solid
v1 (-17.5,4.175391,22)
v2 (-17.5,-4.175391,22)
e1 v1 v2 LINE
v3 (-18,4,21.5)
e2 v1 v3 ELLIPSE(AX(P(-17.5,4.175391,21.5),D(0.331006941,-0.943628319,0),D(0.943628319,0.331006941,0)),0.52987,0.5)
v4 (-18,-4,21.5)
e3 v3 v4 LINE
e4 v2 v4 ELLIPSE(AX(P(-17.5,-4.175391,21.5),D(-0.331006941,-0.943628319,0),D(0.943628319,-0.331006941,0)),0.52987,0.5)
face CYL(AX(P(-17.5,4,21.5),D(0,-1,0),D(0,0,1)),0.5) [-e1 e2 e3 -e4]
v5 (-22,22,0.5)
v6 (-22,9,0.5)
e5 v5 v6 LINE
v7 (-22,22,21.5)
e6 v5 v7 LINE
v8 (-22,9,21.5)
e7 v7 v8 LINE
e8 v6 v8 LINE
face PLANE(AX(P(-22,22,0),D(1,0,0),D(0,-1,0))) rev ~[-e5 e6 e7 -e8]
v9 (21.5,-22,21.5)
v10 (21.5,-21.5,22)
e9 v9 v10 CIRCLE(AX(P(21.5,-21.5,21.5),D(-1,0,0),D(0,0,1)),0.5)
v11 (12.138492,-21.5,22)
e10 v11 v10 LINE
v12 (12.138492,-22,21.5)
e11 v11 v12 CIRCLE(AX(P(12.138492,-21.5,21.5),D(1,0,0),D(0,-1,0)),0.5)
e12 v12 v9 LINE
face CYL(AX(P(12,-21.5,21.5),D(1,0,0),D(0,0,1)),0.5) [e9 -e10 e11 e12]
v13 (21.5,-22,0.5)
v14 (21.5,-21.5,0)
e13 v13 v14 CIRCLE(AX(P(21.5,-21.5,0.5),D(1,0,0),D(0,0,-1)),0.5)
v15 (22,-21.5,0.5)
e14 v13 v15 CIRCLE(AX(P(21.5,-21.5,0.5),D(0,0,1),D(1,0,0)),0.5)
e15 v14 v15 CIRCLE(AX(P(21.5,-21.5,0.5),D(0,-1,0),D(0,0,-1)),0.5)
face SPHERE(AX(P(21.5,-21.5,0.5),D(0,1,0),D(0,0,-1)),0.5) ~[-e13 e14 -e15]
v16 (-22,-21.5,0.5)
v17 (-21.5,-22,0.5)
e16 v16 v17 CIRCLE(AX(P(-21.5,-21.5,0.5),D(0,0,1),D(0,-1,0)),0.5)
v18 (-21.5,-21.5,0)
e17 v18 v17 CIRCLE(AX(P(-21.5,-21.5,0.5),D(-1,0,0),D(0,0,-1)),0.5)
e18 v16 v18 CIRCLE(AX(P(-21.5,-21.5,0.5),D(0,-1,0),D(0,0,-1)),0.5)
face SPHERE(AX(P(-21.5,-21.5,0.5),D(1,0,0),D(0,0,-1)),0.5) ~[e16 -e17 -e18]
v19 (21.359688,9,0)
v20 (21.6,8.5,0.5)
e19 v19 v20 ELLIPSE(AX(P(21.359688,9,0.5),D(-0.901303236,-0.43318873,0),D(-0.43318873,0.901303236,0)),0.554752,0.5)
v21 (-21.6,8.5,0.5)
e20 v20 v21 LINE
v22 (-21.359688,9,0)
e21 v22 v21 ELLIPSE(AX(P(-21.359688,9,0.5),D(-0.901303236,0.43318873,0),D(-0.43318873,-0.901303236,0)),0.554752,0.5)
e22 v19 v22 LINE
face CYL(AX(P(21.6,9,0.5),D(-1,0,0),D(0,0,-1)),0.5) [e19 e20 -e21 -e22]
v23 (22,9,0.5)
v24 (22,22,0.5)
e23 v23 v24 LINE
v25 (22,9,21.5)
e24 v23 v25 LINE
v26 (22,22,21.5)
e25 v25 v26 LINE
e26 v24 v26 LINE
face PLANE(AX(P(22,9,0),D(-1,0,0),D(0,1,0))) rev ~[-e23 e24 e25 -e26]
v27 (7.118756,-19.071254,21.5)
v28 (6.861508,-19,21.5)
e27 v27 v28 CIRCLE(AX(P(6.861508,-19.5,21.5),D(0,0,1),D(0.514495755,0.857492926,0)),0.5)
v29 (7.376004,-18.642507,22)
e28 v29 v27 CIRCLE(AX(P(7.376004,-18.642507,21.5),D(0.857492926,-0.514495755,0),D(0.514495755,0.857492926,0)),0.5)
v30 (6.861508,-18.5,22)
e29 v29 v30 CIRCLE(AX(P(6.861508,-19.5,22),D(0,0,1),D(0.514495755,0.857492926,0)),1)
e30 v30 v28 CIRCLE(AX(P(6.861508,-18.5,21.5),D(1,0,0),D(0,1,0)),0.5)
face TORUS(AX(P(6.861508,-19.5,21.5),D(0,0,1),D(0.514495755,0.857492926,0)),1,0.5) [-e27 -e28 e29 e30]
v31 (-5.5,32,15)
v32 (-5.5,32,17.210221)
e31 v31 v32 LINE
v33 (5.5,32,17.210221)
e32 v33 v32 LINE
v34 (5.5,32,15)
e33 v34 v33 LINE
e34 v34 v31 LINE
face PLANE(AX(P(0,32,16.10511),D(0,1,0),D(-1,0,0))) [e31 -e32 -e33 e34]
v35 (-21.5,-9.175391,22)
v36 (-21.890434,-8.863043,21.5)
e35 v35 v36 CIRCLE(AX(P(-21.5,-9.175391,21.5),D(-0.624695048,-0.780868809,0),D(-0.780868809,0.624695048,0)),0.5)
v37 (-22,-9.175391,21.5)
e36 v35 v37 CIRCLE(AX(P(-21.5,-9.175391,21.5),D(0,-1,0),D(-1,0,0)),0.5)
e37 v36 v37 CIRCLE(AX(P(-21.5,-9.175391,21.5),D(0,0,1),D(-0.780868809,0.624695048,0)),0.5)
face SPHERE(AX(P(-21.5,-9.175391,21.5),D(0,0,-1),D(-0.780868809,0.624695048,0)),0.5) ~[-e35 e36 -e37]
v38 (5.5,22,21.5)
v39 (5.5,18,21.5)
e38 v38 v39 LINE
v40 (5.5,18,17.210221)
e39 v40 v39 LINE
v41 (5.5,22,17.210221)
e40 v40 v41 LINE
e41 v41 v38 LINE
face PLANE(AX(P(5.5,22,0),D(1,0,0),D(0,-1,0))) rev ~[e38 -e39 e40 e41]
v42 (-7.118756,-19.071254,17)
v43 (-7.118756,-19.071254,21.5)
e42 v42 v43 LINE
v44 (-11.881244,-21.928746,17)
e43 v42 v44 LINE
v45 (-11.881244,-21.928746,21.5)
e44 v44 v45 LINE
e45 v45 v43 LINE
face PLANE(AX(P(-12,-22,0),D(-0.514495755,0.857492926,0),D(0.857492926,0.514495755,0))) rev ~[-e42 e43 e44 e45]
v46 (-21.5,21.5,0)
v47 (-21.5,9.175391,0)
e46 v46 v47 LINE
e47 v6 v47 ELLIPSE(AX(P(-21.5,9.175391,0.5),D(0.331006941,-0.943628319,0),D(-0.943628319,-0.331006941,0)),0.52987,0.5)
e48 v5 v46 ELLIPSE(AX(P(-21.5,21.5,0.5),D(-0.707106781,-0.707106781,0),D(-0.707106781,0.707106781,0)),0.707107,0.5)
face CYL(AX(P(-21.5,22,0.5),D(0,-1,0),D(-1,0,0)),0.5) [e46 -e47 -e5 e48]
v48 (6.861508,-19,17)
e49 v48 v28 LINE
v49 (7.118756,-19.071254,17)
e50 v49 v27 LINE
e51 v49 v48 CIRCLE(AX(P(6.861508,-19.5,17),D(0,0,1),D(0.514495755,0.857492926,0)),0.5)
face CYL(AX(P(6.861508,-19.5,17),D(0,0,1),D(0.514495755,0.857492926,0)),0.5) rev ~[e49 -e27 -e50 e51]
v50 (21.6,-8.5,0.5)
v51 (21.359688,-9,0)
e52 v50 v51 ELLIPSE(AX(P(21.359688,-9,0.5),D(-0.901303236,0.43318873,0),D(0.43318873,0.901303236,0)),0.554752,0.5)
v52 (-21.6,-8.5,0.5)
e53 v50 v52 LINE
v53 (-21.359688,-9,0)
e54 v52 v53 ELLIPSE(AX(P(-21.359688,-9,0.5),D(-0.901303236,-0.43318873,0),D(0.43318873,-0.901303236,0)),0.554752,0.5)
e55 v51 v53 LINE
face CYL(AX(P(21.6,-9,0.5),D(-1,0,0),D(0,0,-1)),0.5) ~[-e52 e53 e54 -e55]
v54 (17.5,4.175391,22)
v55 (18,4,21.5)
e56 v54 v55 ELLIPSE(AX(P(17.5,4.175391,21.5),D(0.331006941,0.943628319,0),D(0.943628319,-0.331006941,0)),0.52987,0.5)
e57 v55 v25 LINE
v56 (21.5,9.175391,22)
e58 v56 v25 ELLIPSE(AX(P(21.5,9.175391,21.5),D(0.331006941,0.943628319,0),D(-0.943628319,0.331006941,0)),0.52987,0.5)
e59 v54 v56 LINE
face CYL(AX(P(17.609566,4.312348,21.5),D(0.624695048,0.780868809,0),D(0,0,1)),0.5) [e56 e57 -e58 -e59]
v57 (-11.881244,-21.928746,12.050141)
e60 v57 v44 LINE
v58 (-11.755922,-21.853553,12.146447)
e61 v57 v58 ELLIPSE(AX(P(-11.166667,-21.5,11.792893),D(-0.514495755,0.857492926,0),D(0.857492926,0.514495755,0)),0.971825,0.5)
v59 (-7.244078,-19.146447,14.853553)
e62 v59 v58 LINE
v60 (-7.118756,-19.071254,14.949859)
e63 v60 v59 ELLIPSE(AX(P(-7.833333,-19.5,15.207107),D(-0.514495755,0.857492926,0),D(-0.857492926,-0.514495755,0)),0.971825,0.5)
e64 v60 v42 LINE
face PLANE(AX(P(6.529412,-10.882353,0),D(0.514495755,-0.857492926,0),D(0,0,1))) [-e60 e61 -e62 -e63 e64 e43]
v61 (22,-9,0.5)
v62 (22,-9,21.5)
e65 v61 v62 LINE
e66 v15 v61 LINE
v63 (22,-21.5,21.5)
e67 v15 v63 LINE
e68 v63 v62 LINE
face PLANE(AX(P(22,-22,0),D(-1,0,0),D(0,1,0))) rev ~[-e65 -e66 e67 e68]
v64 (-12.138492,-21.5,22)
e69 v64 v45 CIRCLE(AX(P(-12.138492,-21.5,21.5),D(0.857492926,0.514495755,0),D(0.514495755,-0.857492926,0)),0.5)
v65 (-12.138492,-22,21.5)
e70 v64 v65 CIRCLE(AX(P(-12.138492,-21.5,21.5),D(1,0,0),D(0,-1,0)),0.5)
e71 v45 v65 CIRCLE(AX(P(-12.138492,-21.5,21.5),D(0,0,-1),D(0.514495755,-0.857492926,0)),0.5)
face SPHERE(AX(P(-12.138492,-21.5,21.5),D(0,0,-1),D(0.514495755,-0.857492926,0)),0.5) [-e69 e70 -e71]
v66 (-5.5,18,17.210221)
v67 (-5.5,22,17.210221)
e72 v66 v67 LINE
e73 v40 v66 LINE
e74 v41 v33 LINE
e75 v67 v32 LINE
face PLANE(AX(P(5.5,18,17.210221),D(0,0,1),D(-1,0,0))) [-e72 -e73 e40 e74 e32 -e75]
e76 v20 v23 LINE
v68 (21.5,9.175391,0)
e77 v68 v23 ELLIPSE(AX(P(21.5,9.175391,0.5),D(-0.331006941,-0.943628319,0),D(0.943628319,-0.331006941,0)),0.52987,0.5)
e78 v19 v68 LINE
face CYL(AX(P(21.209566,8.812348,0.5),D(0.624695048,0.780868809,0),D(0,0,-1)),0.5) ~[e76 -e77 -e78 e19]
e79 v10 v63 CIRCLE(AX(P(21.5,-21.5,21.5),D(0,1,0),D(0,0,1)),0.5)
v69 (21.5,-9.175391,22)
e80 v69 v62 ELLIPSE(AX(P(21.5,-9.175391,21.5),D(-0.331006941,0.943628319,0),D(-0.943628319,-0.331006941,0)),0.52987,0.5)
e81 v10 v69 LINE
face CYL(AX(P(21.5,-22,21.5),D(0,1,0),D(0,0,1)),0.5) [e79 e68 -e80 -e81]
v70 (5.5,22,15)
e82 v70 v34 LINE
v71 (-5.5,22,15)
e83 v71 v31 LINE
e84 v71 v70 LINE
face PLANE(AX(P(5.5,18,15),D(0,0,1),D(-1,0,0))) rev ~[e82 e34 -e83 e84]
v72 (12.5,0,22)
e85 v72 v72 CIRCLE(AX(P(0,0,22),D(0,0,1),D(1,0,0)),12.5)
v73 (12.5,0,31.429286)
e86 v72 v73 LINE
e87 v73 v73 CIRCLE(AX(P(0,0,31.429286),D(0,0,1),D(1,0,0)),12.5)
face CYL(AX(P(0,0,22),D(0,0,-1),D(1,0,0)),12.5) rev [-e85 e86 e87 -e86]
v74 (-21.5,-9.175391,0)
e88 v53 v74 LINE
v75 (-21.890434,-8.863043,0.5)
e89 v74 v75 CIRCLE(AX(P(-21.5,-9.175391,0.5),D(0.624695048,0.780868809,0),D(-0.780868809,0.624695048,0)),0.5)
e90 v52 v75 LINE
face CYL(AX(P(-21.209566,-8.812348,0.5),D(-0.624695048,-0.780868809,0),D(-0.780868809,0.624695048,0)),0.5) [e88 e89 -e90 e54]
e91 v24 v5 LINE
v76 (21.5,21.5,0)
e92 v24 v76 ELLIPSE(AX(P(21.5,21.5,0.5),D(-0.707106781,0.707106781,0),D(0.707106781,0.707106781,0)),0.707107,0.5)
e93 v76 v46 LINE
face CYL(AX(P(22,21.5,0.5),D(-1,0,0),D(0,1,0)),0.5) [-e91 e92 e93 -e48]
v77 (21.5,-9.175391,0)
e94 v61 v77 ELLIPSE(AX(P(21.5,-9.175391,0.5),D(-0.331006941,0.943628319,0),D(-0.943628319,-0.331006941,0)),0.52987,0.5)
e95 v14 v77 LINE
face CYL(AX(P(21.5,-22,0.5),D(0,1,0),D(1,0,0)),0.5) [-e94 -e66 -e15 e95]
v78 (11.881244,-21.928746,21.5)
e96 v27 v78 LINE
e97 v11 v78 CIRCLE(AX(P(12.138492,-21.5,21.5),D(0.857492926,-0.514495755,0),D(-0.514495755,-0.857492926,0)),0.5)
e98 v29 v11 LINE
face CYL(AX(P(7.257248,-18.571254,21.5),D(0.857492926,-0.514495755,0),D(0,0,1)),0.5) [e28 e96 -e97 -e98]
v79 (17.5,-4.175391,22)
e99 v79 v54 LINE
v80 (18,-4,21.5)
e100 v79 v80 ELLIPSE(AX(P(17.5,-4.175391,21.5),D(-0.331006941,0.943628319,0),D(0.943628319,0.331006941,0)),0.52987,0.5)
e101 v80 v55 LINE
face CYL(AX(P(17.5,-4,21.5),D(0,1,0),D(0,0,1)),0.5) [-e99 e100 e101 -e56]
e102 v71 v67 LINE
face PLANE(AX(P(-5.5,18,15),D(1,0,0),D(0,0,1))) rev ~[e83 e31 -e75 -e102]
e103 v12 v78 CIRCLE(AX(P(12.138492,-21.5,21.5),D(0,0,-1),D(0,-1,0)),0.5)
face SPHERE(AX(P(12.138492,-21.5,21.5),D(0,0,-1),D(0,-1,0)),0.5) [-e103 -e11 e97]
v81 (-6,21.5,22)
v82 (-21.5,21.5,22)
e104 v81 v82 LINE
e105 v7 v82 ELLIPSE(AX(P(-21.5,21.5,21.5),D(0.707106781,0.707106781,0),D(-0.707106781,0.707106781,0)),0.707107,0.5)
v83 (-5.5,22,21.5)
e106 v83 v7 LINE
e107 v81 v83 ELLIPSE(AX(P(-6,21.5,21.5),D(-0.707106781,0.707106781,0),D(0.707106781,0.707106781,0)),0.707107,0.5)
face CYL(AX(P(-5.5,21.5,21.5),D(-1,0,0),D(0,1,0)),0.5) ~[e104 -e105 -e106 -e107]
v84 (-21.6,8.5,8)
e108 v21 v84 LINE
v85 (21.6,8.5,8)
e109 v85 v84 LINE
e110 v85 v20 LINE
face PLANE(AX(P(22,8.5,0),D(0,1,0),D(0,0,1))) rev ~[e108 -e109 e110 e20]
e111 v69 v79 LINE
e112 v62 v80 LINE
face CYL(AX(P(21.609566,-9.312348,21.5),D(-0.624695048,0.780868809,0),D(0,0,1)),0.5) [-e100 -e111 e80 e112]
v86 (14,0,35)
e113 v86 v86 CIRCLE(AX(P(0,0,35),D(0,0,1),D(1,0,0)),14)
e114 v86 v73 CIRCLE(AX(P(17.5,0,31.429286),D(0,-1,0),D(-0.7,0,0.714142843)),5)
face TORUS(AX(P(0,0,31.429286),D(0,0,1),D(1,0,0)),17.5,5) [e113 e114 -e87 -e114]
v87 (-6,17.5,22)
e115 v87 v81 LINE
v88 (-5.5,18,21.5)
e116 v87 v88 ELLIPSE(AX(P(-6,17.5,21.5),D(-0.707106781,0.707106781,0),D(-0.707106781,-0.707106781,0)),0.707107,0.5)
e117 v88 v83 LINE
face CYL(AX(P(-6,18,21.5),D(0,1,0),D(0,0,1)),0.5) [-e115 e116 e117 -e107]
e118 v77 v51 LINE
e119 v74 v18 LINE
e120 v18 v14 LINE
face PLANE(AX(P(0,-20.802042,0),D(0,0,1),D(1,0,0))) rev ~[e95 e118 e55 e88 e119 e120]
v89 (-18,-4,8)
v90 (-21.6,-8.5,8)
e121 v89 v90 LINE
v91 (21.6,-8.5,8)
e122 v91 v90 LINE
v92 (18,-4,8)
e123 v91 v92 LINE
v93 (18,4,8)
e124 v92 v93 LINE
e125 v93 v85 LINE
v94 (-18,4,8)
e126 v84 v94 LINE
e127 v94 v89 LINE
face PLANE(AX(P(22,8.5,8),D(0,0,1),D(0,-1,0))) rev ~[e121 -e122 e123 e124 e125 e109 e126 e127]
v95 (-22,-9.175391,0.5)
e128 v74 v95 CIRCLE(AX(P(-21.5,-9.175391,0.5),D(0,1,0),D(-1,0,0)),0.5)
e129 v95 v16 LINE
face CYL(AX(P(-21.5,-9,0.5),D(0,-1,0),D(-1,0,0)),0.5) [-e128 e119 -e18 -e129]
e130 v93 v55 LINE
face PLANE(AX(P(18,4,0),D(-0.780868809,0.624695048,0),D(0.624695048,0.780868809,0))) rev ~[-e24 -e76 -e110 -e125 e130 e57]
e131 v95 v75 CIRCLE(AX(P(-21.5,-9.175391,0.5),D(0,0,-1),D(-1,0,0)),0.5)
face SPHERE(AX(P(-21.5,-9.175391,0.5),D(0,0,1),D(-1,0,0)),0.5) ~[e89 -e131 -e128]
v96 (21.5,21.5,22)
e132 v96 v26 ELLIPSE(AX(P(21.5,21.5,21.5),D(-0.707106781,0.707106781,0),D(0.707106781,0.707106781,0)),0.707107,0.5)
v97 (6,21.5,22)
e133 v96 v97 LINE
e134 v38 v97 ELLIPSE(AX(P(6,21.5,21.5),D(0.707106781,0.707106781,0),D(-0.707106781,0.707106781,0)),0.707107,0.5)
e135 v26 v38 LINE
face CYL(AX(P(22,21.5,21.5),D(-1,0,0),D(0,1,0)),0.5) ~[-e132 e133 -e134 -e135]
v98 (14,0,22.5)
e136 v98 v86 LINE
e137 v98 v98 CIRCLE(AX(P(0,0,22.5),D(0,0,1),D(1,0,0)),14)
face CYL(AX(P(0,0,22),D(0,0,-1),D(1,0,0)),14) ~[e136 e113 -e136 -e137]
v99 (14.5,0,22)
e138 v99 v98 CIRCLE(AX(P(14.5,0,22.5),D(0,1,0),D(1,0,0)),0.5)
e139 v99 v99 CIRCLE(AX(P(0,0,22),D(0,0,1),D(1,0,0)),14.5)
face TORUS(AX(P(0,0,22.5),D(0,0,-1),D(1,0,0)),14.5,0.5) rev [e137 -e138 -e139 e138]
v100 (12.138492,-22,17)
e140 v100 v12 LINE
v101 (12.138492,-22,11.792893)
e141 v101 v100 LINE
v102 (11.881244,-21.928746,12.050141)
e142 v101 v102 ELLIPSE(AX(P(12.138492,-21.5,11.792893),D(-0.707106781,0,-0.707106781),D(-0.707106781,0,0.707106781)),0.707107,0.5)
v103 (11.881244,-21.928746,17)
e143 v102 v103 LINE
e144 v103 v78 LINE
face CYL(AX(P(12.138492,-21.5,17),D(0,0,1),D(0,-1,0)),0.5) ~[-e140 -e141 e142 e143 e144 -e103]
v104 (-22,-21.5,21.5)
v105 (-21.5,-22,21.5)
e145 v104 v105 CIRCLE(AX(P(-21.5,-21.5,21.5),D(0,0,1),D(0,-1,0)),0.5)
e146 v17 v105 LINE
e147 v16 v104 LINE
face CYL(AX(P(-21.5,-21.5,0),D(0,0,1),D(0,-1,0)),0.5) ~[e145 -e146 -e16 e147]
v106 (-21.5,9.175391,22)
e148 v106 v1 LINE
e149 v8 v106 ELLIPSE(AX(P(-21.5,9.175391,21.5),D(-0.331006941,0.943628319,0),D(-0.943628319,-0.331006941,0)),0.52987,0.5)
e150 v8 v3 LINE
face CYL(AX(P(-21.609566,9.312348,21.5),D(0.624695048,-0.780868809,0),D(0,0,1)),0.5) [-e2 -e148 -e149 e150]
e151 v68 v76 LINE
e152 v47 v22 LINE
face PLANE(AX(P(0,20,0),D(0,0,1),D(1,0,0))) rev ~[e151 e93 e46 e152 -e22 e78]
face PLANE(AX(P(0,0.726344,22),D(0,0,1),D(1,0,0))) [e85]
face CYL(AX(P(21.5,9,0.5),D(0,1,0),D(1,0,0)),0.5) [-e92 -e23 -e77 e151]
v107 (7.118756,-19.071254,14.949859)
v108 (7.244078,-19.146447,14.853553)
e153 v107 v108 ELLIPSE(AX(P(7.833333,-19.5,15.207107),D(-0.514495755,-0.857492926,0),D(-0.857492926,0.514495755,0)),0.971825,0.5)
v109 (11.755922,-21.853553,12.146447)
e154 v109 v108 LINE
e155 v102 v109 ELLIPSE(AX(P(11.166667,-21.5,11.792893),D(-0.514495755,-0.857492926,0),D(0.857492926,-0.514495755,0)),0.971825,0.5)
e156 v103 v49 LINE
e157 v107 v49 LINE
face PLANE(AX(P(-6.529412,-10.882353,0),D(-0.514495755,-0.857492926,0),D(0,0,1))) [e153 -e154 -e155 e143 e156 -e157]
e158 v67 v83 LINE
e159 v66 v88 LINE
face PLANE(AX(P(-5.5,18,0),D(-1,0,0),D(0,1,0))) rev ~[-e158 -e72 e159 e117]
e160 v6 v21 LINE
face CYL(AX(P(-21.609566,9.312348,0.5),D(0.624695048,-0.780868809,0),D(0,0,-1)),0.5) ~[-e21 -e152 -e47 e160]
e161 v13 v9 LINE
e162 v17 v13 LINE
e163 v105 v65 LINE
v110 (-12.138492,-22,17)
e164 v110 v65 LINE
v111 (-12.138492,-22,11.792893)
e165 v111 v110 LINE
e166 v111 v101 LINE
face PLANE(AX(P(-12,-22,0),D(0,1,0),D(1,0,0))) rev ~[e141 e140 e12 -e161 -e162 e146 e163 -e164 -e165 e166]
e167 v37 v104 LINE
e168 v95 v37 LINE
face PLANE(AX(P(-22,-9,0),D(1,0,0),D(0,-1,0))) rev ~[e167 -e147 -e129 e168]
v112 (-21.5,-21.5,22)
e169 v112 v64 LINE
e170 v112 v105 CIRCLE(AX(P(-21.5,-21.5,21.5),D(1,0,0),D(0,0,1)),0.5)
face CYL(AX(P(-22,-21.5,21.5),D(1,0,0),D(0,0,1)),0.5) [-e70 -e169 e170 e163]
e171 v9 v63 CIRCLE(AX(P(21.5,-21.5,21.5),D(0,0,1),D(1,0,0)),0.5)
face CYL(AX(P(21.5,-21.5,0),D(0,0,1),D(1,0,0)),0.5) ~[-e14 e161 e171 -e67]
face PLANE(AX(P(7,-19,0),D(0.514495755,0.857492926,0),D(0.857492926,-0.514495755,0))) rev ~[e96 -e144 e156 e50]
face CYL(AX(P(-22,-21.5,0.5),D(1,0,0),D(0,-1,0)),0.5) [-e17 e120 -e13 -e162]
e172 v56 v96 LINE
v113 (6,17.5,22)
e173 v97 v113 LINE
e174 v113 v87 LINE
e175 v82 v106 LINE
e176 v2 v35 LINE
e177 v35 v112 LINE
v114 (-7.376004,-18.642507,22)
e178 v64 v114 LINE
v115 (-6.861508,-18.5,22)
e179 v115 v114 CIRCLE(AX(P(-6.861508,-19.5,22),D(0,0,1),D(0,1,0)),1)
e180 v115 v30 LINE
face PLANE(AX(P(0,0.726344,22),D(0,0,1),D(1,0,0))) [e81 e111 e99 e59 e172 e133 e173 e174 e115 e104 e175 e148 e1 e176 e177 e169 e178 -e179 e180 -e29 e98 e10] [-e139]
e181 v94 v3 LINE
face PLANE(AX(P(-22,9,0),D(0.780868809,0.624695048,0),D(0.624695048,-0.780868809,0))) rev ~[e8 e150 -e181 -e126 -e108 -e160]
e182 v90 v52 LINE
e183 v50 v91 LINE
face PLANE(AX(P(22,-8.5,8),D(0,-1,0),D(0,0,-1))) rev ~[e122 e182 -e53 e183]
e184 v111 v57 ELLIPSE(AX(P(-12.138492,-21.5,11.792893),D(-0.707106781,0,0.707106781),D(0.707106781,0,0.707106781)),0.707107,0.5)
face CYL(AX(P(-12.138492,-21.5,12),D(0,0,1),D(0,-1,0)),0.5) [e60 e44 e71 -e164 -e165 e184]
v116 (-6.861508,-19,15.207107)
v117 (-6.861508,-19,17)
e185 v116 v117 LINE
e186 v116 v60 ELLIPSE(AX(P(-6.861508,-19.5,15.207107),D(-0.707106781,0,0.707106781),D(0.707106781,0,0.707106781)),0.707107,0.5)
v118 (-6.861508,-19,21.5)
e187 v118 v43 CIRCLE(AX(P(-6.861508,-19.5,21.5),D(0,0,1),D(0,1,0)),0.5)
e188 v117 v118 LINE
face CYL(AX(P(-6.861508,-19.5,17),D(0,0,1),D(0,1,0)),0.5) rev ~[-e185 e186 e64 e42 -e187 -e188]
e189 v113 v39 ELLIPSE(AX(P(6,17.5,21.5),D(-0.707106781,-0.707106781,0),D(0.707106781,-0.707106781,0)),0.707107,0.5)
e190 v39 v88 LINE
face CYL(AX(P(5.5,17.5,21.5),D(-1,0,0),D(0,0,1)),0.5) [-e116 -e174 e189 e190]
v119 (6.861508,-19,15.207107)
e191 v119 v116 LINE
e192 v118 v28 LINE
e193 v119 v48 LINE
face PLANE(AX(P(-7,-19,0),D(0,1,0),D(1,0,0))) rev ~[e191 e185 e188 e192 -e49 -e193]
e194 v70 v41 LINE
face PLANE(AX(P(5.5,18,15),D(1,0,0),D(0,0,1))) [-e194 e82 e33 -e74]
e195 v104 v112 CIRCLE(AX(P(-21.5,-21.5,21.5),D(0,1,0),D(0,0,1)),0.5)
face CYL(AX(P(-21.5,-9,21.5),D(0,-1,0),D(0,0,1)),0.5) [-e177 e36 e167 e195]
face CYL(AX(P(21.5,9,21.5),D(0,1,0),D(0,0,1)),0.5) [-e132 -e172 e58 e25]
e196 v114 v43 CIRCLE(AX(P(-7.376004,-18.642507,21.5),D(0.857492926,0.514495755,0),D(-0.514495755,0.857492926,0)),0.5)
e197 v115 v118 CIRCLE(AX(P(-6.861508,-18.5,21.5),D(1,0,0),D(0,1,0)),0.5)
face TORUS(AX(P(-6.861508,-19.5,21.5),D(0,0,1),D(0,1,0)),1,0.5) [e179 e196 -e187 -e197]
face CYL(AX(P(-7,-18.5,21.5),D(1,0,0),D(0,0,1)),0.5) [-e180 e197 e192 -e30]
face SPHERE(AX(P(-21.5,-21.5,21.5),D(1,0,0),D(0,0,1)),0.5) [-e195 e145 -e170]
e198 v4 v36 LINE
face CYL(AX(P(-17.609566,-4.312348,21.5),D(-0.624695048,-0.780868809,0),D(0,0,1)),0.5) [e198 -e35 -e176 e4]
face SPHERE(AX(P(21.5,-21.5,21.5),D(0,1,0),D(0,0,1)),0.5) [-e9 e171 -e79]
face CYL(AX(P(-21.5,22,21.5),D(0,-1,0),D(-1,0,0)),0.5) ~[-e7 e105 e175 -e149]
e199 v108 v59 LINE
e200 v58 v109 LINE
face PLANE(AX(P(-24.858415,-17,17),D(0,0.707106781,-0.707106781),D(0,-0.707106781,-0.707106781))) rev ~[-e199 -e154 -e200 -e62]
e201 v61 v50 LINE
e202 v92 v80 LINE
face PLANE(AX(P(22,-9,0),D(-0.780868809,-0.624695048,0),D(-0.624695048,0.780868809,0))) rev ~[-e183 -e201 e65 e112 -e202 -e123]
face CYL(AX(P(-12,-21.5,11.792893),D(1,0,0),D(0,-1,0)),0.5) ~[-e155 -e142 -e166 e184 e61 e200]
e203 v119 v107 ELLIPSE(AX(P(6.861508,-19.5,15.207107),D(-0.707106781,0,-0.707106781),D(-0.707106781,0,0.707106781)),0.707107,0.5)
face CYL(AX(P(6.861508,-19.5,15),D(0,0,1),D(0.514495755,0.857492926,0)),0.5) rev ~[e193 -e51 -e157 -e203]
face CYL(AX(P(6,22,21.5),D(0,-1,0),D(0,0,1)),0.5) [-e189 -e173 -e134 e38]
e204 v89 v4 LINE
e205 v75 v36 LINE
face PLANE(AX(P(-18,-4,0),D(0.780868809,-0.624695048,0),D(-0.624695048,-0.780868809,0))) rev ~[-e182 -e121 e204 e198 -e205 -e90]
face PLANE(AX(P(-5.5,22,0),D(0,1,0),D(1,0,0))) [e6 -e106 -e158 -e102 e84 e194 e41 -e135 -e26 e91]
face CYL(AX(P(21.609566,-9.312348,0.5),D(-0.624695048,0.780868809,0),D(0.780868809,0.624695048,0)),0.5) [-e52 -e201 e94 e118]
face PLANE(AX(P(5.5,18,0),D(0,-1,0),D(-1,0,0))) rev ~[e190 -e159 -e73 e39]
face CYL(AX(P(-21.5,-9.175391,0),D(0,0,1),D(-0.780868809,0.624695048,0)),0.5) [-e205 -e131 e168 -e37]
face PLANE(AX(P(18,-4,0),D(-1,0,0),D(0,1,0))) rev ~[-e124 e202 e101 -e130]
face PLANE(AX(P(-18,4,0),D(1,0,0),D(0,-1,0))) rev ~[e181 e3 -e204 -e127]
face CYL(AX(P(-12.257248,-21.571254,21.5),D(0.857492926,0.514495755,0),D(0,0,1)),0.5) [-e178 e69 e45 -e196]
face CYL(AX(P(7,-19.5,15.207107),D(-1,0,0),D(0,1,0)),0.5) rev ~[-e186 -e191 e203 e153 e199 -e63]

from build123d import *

# Parameters (mm, degrees)
F1_DEPTH    = 22
F2_DEPTH    = 17
F3_T4_DEPTH = 49.7168298797
F5_DEPTH    = 44
F0_W        = 11
F0_H        = 4
F6_DEPTH    = 15
F7_W        = 11
F7_H        = 2.2102209181
F8_DEPTH    = 14
F9_R        = 14
F9_R_2      = 12.5
F10_DEPTH   = 13
F12_R       = 0.5


# Not quite as in the source:
# - a fillet or chamfer that OpenCascade refuses, or shapes differently, is made with other operations: its cross-section is extruded or revolved along the edge and cut away or added


with BuildPart() as f1:
    # F0 (on Top) → F1 (new body)
    with BuildSketch(Plane.XY):
        Polygon((22, 9), (22, 22), (5.5, 22), (5.5, 18), (-5.5, 18), (-5.5, 22), (-22, 22), (-22, 9), (-18, 4), (-18, -4), (-22, -9), (-22, -22), (-12, -22), (-7, -19), (7, -19), (12, -22), (22, -22), (22, -9), (18, -4), (18, 4), align=None)
    extrude(amount=F1_DEPTH)

    # F0 (on Top) → F2 (join)
    with BuildSketch(Plane.XY):
        Polygon((-12, -22), (12, -22), (7, -19), (-7, -19), align=None)
    extrude(amount=F2_DEPTH)

    # F3: chamfer of 5 on 1 edges, made by hand


with BuildPart() as f3_tool2:
    # F3_s3 → F3_t4 (new body)
    with BuildSketch(Plane.YZ.offset(-24.8584149398)):
        Polygon((-17, 17), (-22, 12), (-22, 17), align=None)
    extrude(amount=F3_T4_DEPTH)

    split(bisect_by=Plane(origin=(-6.5294117647, -10.8823529412, 0), x_dir=(0, 0, 1), z_dir=(-0.5144957554, -0.8574929257, 0)), keep=Keep.TOP)

    split(bisect_by=Plane.XZ.offset(19), keep=Keep.TOP)

    split(bisect_by=Plane(origin=(6.5294117647, -10.8823529412, 0), x_dir=(0, 0, 1), z_dir=(0.5144957554, -0.8574929257, 0)), keep=Keep.TOP)


with BuildPart() as f1_1:
    add(f1.part)

    # F3_t1: cut F3_tool2
    add(f3_tool2.part, mode=Mode.SUBTRACT)

    # F4 (on face) → F5 (cut, through all)
    with BuildSketch(Plane.YZ.offset(22)):
        Polygon((8.5, 8), (-8.5, 8), (-8.5, 0), (0, 0), (8.5, 0), align=None)
    extrude(amount=-F5_DEPTH, mode=Mode.SUBTRACT)

    # F0 (on Top) → F6 (join)
    with BuildSketch(Plane.XY):
        with Locations((0, 20)):
            Rectangle(F0_W, F0_H)
    extrude(amount=F6_DEPTH)

    # F7 (on face) → F8 (join)
    with BuildSketch(Plane(origin=(0, 18, 0), x_dir=(-1, 0, 0), z_dir=(0, 1, 0))):
        with Locations((0, 16.105110459)):
            Rectangle(F7_W, F7_H)
    extrude(amount=F8_DEPTH)

    # F9 (on face) → F10 (join)
    with BuildSketch(Plane.XY.offset(22)):
        Circle(F9_R)
        Circle(F9_R_2, mode=Mode.SUBTRACT)
    extrude(amount=F10_DEPTH)

    # F11: fillet of radius 5 on 1 edges, made by hand

    # F11_s1 → F11_t2 (revolve, cut)
    with BuildSketch(Plane.XZ):
        with BuildLine():
            ThreePointArc((14, 35), (12.8902277714, 33.3657774588), (12.5, 31.4292857857))
            Line((12.5, 31.4292857857), (12.5, 35))
            Line((12.5, 35), (14, 35))
        make_face()
    revolve(axis=Axis((0, 0, 35), (0, 0, 1)), mode=Mode.SUBTRACT)

    # F12
    f12_edges = [f1_1.edges().sort_by_distance(p)[0] for p in [
        (22, 15.5, 22),
        (20, 6.5, 22),
        (13.75, 22, 22),
        (18, 0, 22),
        (5.5, 20, 22),
        (20, -6.5, 22),
        (0, 18, 22),
        (22, -15.5, 22),
        (-5.5, 20, 22),
        (17, -22, 22),
        (-13.75, 22, 22),
        (9.5, -20.5, 22),
        (-22, 15.5, 22),
        (0, -19, 22),
        (-20, 6.5, 22),
        (-9.5, -20.5, 22),
        (-18, 0, 22),
        (-17, -22, 22),
        (-20, -6.5, 22),
        (-22, -15.5, 22),
        (-14, 0, 22),
        (21.8, 8.75, 0),
        (22, 15.5, 0),
        (0, 22, 0),
        (-22, 15.5, 0),
        (-21.8, 8.75, 0),
        (0, 8.5, 0),
        (21.8, -8.75, 0),
        (22, -15.5, 0),
        (0, -22, 0),
        (-22, -15.5, 0),
        (-21.8, -8.75, 0),
        (0, -8.5, 0),
        (7, -19, 18.5),
        (0, -19, 15),
        (-7, -19, 18.5),
        (-22, -22, 11),
        (-12, -22, 17),
        (0, -22, 12),
        (12, -22, 17),
        (22, -22, 11),
        (-22, -9, 11),
    ]]
    fillet(f12_edges, radius=F12_R)


solid = f1_1.part
